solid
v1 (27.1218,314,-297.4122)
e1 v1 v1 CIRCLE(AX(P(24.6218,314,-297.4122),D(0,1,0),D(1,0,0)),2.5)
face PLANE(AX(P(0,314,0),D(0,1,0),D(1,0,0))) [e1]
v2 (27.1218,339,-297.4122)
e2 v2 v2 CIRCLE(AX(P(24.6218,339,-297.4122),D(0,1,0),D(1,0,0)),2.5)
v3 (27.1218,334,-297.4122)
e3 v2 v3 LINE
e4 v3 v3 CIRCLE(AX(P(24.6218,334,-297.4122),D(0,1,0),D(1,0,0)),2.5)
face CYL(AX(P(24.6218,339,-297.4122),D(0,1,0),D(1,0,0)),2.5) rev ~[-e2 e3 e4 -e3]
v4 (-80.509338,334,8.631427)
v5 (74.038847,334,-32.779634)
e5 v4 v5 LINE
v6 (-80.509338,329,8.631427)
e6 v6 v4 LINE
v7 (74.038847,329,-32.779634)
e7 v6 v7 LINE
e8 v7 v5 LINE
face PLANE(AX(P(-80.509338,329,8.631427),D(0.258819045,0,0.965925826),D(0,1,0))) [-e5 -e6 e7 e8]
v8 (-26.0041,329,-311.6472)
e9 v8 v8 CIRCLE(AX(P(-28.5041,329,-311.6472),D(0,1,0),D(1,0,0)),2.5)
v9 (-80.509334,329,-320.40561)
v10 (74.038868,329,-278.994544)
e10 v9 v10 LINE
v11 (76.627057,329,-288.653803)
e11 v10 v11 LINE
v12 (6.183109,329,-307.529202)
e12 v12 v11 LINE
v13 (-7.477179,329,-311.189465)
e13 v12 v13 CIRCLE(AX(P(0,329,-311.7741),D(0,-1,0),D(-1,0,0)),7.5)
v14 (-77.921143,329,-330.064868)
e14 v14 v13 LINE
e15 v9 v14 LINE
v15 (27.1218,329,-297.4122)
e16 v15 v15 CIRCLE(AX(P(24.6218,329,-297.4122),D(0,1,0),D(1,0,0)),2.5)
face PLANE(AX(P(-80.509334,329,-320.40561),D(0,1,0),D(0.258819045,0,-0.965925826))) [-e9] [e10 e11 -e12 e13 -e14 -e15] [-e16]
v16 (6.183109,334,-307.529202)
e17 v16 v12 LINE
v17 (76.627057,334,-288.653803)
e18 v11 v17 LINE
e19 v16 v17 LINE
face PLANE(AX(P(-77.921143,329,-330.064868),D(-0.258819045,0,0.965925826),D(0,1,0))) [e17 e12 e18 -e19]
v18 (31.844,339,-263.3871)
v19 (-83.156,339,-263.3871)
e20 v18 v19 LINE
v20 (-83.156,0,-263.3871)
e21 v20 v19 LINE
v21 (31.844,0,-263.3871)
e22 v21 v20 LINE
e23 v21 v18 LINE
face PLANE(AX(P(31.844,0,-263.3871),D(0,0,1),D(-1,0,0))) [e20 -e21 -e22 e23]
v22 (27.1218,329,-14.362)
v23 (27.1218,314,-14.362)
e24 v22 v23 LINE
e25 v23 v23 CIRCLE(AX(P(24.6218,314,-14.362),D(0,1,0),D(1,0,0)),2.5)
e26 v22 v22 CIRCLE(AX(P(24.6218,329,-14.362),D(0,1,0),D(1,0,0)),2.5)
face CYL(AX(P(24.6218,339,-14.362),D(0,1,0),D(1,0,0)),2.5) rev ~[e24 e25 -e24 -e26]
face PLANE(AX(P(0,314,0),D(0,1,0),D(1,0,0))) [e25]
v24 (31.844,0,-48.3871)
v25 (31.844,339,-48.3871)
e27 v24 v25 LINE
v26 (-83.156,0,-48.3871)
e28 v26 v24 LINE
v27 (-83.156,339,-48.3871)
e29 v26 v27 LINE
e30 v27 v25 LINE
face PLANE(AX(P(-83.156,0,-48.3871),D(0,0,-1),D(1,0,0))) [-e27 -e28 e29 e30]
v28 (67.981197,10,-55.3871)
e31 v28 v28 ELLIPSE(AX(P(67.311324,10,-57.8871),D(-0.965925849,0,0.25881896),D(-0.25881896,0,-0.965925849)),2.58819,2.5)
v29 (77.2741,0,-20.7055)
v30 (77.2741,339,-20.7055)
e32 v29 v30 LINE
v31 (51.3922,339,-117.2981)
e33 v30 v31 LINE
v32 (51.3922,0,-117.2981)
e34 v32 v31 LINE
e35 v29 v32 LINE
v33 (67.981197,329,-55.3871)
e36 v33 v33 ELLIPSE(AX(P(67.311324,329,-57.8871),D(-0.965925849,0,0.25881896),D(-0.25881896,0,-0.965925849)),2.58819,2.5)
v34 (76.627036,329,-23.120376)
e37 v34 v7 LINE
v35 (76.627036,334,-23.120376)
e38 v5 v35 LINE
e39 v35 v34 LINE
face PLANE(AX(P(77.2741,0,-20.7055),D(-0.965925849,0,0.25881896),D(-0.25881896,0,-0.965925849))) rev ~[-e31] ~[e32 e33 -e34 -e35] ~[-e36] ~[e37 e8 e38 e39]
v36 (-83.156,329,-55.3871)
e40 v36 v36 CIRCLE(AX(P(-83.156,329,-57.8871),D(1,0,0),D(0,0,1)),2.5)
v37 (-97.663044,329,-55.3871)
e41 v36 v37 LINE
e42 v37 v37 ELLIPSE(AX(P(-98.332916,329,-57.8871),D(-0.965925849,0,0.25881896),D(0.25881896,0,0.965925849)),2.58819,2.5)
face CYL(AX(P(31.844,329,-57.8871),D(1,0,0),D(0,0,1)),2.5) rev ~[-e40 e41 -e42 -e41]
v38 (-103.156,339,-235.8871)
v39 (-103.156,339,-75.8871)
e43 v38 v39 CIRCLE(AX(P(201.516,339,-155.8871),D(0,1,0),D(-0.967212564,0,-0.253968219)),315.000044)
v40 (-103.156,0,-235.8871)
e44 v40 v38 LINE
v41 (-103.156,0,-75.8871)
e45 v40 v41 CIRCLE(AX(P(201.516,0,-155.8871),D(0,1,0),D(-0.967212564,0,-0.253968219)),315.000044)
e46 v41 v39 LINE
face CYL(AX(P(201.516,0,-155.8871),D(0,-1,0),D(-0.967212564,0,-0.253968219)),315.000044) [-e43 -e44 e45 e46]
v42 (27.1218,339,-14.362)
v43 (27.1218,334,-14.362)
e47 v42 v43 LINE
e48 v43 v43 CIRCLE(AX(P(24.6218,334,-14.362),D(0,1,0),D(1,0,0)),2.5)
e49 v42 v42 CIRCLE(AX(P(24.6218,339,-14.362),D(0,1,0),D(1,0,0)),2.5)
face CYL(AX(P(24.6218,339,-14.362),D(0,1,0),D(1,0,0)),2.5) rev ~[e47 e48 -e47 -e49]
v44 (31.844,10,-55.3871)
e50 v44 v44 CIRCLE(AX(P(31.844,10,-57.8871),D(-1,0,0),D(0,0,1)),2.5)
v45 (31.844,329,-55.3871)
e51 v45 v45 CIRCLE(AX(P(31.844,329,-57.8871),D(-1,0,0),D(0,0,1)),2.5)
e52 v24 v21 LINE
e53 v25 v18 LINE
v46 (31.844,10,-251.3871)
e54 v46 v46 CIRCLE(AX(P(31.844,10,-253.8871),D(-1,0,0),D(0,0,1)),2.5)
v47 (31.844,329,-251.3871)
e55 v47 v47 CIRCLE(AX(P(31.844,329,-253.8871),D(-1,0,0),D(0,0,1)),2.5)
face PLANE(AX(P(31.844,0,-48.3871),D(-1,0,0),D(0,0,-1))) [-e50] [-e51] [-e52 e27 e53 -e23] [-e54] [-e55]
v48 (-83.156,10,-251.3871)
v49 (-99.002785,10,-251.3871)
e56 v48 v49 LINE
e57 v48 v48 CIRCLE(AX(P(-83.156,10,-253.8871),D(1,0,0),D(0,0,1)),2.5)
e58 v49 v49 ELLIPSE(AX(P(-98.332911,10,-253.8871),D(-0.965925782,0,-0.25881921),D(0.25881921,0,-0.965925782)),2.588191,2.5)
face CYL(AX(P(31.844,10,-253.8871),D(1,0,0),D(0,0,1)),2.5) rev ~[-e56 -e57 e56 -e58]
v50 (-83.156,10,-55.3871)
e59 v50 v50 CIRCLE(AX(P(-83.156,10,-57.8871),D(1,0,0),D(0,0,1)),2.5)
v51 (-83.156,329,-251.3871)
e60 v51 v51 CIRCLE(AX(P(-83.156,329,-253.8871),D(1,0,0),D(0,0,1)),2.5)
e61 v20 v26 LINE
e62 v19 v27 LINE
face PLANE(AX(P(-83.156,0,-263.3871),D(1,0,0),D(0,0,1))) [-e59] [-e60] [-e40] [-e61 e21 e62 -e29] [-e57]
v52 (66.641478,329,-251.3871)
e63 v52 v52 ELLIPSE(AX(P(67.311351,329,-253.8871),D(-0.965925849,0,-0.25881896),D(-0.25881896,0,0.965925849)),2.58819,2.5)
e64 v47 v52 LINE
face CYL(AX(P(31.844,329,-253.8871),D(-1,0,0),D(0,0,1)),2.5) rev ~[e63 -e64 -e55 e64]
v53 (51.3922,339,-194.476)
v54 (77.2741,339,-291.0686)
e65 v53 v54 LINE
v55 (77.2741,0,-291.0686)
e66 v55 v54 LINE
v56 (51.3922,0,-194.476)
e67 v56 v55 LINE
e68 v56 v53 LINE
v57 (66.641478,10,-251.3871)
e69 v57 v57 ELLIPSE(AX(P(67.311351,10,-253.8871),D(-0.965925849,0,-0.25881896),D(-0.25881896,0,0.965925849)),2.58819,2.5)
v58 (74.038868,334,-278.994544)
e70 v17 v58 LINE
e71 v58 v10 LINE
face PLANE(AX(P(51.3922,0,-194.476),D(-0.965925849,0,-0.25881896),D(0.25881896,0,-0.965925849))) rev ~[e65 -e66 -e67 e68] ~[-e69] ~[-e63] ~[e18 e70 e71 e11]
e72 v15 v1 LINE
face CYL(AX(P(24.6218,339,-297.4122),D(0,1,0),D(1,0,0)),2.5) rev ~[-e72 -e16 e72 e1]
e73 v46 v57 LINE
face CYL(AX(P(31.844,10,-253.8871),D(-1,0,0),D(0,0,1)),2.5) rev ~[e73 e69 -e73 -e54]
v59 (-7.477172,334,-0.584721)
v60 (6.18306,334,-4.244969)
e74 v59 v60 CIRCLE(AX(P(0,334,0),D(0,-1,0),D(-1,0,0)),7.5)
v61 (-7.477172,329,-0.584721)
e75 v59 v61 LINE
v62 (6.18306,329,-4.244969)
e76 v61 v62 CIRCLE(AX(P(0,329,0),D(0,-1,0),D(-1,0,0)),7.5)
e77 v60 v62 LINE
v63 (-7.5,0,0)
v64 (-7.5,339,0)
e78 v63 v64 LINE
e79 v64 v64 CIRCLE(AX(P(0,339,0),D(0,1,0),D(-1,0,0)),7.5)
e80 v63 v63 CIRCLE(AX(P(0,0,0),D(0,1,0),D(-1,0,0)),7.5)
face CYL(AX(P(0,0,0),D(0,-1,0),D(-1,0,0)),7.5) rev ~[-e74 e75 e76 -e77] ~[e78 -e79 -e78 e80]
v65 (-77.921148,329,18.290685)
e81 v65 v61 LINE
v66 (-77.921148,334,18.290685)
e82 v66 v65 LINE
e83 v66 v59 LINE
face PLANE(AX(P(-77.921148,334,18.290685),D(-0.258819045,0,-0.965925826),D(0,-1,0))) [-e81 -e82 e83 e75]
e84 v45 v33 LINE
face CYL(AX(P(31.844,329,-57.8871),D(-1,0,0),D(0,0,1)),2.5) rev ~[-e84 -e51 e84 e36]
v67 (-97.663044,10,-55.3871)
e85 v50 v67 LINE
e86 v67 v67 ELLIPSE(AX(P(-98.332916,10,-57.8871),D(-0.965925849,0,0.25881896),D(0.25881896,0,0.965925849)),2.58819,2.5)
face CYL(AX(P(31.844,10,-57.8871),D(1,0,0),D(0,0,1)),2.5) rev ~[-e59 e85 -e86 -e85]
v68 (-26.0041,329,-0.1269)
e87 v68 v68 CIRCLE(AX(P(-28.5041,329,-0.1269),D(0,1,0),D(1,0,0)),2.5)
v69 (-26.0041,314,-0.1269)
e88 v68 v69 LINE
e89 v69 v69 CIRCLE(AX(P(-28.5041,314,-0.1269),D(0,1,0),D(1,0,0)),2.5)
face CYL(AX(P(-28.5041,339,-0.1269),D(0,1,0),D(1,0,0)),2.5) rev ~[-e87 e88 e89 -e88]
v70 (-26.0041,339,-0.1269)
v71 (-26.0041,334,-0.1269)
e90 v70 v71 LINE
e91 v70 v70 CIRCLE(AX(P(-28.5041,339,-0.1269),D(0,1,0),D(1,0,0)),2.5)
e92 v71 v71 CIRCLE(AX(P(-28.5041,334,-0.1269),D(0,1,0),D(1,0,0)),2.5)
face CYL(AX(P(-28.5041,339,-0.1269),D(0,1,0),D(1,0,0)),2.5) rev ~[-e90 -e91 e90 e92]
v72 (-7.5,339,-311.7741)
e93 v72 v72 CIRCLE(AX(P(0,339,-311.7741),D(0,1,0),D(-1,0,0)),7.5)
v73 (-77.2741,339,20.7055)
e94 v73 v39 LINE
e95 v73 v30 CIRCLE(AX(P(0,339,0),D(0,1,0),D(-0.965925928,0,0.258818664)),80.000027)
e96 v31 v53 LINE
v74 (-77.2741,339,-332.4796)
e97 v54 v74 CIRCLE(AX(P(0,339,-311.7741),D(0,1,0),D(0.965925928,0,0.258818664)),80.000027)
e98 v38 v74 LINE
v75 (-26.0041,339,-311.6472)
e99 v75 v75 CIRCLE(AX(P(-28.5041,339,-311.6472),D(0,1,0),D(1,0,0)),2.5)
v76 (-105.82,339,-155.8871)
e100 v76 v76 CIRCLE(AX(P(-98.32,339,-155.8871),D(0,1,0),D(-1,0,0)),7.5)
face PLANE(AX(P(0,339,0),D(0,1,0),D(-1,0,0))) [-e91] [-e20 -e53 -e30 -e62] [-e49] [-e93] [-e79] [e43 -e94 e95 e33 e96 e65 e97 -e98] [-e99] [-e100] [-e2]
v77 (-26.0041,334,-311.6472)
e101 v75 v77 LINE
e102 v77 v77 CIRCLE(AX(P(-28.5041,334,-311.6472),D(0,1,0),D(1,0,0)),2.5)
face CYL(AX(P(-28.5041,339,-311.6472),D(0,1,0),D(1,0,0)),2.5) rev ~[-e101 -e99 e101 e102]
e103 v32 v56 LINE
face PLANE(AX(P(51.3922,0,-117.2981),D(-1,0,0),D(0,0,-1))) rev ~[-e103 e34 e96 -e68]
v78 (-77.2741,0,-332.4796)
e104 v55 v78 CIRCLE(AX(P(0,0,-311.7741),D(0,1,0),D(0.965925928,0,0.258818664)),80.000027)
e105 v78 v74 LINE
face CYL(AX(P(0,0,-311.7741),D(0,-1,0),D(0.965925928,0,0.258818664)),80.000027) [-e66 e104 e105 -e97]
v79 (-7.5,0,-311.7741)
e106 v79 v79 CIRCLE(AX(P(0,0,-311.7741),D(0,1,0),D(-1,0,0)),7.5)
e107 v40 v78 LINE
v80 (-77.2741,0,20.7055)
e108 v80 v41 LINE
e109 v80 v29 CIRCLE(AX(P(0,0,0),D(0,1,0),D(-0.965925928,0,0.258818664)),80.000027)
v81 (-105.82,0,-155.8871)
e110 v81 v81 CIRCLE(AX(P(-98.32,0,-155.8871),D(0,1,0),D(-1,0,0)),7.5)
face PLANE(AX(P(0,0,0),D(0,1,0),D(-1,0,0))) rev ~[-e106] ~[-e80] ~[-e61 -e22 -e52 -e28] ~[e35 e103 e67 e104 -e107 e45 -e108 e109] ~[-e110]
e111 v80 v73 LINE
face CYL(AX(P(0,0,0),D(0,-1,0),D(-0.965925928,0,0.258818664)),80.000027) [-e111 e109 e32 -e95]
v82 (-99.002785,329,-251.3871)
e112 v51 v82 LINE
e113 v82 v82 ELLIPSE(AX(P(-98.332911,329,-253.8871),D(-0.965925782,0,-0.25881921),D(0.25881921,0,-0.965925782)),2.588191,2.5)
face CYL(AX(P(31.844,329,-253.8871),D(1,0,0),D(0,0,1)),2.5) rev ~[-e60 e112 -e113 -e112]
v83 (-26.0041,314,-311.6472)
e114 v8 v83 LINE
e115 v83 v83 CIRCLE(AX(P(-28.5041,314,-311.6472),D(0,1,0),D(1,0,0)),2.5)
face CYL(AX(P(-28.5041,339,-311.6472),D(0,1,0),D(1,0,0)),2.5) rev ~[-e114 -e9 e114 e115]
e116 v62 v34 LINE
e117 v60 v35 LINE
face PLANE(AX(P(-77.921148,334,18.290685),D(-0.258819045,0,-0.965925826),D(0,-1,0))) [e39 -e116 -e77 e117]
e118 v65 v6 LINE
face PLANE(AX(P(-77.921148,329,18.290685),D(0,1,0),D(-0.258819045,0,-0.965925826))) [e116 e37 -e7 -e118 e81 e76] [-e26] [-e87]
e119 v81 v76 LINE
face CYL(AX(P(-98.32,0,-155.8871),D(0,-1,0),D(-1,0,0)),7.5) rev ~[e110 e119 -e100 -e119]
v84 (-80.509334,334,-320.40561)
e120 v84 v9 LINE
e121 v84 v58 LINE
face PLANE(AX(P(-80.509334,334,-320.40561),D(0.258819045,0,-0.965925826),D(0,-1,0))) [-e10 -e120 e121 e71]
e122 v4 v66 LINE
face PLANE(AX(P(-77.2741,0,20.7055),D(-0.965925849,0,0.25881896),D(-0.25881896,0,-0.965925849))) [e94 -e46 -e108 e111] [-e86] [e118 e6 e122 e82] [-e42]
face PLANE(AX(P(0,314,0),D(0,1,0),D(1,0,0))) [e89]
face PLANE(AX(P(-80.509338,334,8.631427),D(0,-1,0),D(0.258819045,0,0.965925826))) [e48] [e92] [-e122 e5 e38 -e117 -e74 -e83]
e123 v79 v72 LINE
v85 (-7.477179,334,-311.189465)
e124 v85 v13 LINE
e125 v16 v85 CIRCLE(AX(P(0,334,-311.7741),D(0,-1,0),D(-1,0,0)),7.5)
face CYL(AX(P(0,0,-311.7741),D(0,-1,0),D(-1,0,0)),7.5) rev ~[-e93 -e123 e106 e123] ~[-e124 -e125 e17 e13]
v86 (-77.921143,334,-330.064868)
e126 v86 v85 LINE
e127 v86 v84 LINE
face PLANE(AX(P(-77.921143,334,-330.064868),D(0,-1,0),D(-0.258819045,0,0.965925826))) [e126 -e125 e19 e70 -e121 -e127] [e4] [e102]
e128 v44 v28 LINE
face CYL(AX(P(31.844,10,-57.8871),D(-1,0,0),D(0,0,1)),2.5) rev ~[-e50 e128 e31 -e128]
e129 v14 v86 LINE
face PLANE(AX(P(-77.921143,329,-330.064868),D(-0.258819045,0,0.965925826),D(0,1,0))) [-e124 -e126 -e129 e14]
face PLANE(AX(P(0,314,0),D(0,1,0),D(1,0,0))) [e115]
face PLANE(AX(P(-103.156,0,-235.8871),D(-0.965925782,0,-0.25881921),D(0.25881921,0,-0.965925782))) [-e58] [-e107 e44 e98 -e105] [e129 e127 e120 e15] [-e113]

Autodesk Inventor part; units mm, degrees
ref_plane "YZ Plane" through (0, 0, 0) normal (1, 0, 0) x (0, 1, 0)
ref_plane "XZ Plane" through (0, 0, 0) normal (0, 1, 0) x (-1, 0, 0)
ref_plane "XY Plane" through (0, 0, 0) normal (0, 0, 1) x (1, 0, 0)
sketch "Sketch2" plane through (0, 0, 0) normal (0, 1, 0) x (-1, 0, 0)
  circle A0 centre (0, 0) radius 80 construction
  line L0 (77.2741, 20.7055) -> (103.156, -75.8871)
  line L1 (-77.2741, -20.7055) -> (-51.3922, -117.2981)
  line L2 (103.156, -75.8871) -> (-51.3922, -117.2981) construction
  line L3 (103.156, -75.8871) -> (103.156, -235.8871) construction
  line L4 (103.156, -235.8871) -> (-51.3922, -194.476) construction
  line L5 (-51.3922, -117.2981) -> (-51.3922, -194.476)
  circle A1 centre (0, -311.7741) radius 80 construction
  line L6 (-51.3922, -194.476) -> (-77.2741, -291.0686)
  line L7 (103.156, -235.8871) -> (77.2741, -332.4796)
  arc A2 (77.2741, 20.7055) -> (-77.2741, -20.7055) centre (0, 0) ccw
  arc A3 (-77.2741, -291.0686) -> (77.2741, -332.4796) centre (0, -311.7741) ccw
  circle A4 centre (0, 0) radius 7.5
  circle A5 centre (0, -311.7741) radius 7.5
  line L8 (83.156, -48.3871) -> (-31.844, -48.3871)
  line L9 (-31.844, -48.3871) -> (-31.844, -263.3871)
  line L10 (-31.844, -263.3871) -> (83.156, -263.3871)
  line L11 (83.156, -263.3871) -> (83.156, -48.3871)
  arc A6 (103.156, -235.8871) -> (103.156, -75.8871) centre (-201.516, -155.8871) ccw
  circle A7 centre (98.32, -155.8871) radius 7.5
  point P0 (103.156, -155.8871)
  point P1 (83.156, -155.8871)
  dimension "d0" = 160
  dimension "d1" = 100
  dimension "d2" = 100
  dimension "d3" = 160
  dimension "d4" = 160
  dimension "d5" = 160
  dimension "d6" = 75
  dimension "d7" = 75
  dimension "d8" = 160
  dimension "d9" = 100
  dimension "d10" = 100
  dimension "d11" = 15
  dimension "d12" = 15
  dimension "d13" = 115
  dimension "d14" = 215
  dimension "d15" = 20
  dimension "d39" = 315
  dimension "d40" = 15
  dimension "d41" = 15.164
extrude "Extrusion1" add sketch "Sketch2" along normal blind 339
sketch "Sketch5" plane through (31.844, 0, -48.3871) normal (-1, 0, 0) x (0, 0, 1)
  line L0 (0, 0) -> (-215, 0) construction
  line L1 (0, 0) -> (0, 339) construction
  line L2 (-215, 339) -> (0, 339) construction
  line L3 (-215, 0) -> (-215, 339) construction
  line L4 (-68.911, 0) -> (27.6815, 0) construction
  line L5 (0, 339) -> (-19, 339) construction
  line L6 (-19, 339) -> (-19, 0) construction
  line L7 (-19, 0) -> (0, 0) construction
  line L8 (0, 0) -> (0, 339) construction
  line L9 (-146.089, 339) -> (-242.6815, 339) construction
  line L10 (-215, 0) -> (-196, 0) construction
  line L11 (-196, 0) -> (-196, 339) construction
  line L12 (-196, 339) -> (-215, 339) construction
  line L13 (-215, 339) -> (-215, 0) construction
  circle A0 centre (-205.5, 329) radius 2.5
  circle A1 centre (-205.5, 10) radius 2.5
  circle A2 centre (-9.5, 329) radius 2.5
  circle A3 centre (-9.5, 10) radius 2.5
  point P0 (-205.5, 0)
  point P1 (-205.5, 339)
  point P2 (-9.5, 0)
  point P3 (-9.5, 339)
  dimension "d52" = 19
  dimension "d53" = 19
  dimension "d54" = 5
  dimension "d55" = 10
  dimension "d56" = 5
  dimension "d57" = 10
  dimension "d58" = 5
  dimension "d59" = 5
  dimension "d60" = 10
  dimension "d61" = 10
extrude "Extrusion4" cut sketch "Sketch5" along normal through all both and the other way through all
sketch "Sketch6" plane through (0, 339, 0) normal (0, 1, 0) x (1, 0, 0)
  line L0 (-28.5041, 0.1269) -> (24.6218, 14.362) construction
  line L1 (-103.156, 75.8871) -> (-77.2741, -20.7055) construction
  line L2 (-77.2741, -20.7055) -> (-103.156, 75.8871) construction
  line L3 (-103.156, 75.8871) -> (51.3922, 117.2981) construction
  line L4 (-25.8819, 96.5926) -> (-1.9411, 7.2444) construction
  circle A0 centre (-28.5041, 0.1269) radius 2.5
  circle A1 centre (24.6218, 14.362) radius 2.5
  line L5 (-103.156, 235.8871) -> (-77.2741, 332.4796) construction
  line L6 (51.3922, 194.476) -> (77.2741, 291.0686) construction
  line L7 (-103.156, 235.8871) -> (51.3922, 194.476) construction
  line L8 (-25.8819, 215.1815) -> (-1.9411, 304.5297) construction
  line L9 (24.6218, 297.4122) -> (-28.5041, 311.6472) construction
  circle A2 centre (-28.5041, 311.6472) radius 2.5
  circle A3 centre (24.6218, 297.4122) radius 2.5
  point P0 (0, 0)
  dimension "d64" = 55
  dimension "d65" = 92.5
  dimension "d66" = 5
  dimension "d67" = 5
  dimension "d68" = 92.5
  dimension "d69" = 5
  dimension "d70" = 5
  dimension "d71" = 55
extrude "Extrusion5" cut sketch "Sketch6" against normal blind 25
sketch "Sketch9" plane through (-77.2741, 0, 20.7055) normal (-0.9659258, 0, 0.258819) x (0.258819, 0, 0.9659258)
  line L0 (-10, 314) -> (-5, 314) projected
  line L1 (-10, 339) -> (-5, 339) projected
  line L2 (-10, 314) -> (-5, 314) projected
  line L3 (-10, 339) -> (-5, 339) projected
  line L4 (-12.5, 334) -> (-2.5, 334)
  line L5 (-2.5, 334) -> (-2.5, 329)
  line L6 (-2.5, 329) -> (-12.5, 329)
  line L7 (-12.5, 329) -> (-12.5, 334)
  point P0 (0, 0)
  point P1 (-7.5, 334)
  point P2 (-7.5, 339)
  dimension "d80" = 10
  dimension "d81" = 5
  dimension "d82" = 5
extrude "Extrusion7" cut sketch "Sketch9" against normal through all
sketch "Sketch10" plane through (-103.156, 0, -235.8871) normal (-0.9659258, 0, -0.258819) x (-0.258819, 0, 0.9659258)
  line L0 (-95, 314) -> (-90, 314) projected
  line L1 (-95, 339) -> (-90, 339) projected
  line L2 (-97.5, 334) -> (-87.5, 334)
  line L3 (-87.5, 334) -> (-87.5, 329)
  line L4 (-87.5, 329) -> (-97.5, 329)
  line L5 (-97.5, 329) -> (-97.5, 334)
  point P0 (201.1507, 0)
  point P1 (-92.5, 334)
  point P2 (-92.5, 339)
  dimension "d85" = 10
  dimension "d86" = 5
  dimension "d87" = 5
extrude "Extrusion8" cut sketch "Sketch10" against normal through all
properties part number "TA001" material "ABS Plastic"
